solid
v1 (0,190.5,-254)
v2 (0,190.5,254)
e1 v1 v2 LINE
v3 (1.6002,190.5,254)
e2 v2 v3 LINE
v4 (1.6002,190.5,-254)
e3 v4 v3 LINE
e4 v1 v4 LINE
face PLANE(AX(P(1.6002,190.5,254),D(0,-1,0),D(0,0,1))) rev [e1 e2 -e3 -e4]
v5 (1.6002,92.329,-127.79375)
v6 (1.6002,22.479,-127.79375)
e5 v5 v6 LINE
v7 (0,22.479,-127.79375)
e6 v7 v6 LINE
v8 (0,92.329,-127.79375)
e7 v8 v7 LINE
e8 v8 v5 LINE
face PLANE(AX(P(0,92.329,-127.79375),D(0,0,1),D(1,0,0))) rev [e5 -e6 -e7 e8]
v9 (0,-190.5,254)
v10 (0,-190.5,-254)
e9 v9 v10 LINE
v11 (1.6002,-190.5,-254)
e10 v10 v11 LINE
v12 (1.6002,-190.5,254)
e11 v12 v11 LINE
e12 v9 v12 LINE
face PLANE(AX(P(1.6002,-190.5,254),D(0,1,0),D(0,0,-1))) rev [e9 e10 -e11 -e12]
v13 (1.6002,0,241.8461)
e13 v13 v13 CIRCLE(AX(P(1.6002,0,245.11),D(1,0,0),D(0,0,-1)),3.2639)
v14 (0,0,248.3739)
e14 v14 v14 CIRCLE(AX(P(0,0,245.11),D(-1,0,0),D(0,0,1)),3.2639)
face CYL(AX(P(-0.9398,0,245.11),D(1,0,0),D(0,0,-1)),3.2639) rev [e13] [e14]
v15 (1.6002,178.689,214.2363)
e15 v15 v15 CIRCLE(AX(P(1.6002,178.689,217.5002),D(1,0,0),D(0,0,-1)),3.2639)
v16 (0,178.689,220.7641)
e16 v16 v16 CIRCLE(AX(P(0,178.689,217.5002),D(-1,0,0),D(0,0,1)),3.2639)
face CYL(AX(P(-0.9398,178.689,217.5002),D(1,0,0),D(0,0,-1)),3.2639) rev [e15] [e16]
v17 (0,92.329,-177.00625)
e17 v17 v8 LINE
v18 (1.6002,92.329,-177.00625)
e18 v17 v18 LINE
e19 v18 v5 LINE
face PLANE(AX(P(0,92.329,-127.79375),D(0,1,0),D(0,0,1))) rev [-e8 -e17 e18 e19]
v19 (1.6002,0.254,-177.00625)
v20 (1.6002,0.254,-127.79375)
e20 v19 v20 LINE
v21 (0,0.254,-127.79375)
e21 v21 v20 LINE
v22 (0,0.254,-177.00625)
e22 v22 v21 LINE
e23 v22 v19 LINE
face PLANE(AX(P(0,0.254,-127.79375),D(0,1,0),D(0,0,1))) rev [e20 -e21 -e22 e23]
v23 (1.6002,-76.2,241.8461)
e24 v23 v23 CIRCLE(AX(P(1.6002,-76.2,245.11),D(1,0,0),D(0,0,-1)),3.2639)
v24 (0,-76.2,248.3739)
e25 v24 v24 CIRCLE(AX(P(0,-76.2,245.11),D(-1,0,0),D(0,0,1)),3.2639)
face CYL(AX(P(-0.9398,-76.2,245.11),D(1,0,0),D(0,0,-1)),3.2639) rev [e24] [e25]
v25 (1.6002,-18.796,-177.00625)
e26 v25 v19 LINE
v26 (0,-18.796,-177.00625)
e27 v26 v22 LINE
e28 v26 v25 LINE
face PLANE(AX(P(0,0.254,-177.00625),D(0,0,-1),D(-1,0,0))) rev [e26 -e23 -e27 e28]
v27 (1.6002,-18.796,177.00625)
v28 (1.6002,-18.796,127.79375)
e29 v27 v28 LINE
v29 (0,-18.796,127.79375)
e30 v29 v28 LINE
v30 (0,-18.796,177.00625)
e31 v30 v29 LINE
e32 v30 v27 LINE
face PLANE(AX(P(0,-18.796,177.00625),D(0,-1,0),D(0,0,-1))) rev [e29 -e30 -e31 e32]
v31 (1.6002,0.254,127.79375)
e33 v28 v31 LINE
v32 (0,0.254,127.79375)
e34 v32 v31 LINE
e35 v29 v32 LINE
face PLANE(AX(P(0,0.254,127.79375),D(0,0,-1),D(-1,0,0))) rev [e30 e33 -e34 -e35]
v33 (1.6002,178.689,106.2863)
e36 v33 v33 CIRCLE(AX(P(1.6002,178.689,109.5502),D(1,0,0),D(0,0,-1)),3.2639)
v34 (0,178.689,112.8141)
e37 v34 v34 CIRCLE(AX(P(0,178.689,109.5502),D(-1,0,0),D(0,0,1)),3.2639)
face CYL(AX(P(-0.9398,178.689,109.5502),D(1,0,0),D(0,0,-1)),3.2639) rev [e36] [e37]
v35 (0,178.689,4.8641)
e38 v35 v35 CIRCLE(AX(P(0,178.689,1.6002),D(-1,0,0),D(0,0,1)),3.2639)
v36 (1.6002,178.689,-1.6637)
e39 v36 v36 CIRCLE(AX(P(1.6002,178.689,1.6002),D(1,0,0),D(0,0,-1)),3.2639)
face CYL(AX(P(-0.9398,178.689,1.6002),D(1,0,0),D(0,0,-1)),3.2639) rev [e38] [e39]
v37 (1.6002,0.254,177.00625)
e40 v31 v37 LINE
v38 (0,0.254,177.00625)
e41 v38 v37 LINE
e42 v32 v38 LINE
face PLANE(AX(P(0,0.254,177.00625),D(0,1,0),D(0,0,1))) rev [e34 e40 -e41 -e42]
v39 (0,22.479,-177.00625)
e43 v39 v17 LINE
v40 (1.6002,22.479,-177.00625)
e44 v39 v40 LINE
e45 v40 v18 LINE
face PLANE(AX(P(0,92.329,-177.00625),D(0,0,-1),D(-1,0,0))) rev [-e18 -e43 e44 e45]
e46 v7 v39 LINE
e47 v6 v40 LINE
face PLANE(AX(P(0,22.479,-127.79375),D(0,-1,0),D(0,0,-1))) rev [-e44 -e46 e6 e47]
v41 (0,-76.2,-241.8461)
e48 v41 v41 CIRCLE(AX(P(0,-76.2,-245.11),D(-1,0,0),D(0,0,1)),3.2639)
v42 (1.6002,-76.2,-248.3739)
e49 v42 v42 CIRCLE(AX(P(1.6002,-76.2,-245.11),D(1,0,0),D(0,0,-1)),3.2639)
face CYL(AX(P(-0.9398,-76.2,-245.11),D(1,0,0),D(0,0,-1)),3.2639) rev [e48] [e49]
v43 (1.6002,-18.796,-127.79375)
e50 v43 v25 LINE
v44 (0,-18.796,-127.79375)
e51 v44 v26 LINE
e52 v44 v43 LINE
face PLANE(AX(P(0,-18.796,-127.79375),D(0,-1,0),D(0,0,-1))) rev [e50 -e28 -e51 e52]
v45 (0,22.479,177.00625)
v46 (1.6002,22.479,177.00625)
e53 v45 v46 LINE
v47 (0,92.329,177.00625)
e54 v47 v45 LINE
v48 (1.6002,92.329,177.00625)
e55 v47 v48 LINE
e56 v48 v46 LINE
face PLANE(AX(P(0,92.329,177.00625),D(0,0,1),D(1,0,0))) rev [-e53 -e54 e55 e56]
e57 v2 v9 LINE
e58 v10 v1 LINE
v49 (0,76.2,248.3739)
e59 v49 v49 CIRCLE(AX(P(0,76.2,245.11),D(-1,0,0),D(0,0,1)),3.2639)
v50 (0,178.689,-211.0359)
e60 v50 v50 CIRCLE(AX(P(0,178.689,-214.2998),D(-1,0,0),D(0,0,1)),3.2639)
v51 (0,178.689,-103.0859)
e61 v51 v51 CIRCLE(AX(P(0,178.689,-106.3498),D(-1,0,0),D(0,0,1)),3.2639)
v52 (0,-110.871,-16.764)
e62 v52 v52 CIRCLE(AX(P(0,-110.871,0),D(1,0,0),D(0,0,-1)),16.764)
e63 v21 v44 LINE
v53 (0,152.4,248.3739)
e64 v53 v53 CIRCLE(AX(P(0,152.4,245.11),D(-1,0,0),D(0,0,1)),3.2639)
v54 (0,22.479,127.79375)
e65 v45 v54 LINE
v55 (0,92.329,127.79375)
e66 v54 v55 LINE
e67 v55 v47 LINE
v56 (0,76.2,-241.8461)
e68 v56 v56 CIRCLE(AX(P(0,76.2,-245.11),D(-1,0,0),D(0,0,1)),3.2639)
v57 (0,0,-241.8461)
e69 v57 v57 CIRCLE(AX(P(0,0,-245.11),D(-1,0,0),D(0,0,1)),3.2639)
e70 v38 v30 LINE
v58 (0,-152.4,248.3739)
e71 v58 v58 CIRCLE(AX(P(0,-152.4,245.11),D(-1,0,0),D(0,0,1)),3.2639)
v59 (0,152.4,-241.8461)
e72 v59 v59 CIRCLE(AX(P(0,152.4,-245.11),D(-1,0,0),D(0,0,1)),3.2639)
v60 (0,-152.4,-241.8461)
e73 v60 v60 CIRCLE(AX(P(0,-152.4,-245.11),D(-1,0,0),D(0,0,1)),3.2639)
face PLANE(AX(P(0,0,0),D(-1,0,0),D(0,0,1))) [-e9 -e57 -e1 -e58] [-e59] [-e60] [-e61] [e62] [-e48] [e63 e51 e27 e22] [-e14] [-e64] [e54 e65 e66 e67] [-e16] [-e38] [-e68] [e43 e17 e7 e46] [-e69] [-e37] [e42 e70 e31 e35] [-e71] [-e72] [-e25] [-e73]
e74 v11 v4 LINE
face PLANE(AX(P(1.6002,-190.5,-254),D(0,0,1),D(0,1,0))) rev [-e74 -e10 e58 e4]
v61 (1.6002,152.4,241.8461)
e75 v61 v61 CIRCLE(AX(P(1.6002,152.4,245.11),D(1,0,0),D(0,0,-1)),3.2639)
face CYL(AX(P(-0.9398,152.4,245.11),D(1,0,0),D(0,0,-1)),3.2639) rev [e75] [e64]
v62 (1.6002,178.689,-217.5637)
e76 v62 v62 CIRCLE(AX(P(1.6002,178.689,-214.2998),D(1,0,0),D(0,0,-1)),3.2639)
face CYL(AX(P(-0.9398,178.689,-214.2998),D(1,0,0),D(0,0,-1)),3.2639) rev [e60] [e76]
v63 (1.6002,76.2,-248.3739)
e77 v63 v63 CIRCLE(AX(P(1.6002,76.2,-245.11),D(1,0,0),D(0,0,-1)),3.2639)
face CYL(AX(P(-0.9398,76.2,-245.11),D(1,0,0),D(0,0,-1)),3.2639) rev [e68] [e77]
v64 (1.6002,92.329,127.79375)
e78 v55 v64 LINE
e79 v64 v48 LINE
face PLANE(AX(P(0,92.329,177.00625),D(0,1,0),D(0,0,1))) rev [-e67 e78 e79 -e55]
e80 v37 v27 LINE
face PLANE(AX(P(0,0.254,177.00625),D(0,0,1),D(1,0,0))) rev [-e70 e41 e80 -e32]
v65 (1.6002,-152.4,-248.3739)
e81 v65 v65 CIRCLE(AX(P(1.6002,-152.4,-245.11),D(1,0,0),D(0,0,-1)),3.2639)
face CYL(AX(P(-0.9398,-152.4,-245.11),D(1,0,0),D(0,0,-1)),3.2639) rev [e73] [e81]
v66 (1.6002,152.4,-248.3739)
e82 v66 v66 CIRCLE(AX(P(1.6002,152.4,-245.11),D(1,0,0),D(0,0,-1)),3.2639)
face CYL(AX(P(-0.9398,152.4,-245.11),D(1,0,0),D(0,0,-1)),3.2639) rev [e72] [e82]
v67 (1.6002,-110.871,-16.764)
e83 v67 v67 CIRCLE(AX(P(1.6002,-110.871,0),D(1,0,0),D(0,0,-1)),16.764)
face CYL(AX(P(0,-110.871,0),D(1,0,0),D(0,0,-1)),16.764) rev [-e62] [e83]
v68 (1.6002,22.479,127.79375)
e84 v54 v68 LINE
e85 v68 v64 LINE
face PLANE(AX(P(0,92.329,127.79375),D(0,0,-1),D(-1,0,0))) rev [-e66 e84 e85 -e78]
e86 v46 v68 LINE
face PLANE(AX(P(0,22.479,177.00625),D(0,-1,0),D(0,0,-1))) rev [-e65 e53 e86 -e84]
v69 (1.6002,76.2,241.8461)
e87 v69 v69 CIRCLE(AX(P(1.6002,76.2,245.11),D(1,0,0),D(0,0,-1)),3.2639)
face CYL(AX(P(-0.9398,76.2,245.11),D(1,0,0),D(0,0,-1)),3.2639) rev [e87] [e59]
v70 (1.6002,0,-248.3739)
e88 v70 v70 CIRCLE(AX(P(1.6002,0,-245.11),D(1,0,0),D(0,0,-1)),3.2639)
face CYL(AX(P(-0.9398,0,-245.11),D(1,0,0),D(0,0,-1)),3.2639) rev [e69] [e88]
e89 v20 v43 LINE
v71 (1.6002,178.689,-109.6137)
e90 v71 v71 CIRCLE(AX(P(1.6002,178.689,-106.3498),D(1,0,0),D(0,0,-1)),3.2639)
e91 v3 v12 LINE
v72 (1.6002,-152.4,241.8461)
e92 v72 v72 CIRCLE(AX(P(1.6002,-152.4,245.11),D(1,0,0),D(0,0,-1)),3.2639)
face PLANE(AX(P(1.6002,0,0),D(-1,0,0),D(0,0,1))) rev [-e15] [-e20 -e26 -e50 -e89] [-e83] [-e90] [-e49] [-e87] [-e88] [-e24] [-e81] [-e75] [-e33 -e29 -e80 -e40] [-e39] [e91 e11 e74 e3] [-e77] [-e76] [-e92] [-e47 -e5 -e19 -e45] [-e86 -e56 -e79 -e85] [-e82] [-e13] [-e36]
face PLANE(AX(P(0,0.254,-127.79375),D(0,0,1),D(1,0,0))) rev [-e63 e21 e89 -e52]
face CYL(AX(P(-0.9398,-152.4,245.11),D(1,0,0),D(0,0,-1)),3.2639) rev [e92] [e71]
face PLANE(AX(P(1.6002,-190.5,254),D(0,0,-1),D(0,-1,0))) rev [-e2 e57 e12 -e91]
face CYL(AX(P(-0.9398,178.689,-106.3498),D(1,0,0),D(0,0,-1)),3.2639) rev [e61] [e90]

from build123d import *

# Parameters (mm, degrees)
SKETCH1_W           = 508
SKETCH1_H           = 381
BOSS_EXTRUDE1_DEPTH = 1.6002
SKETCH5_R           = 3.2639
CUT_EXTRUDE1_DEPTH  = 2.54
SKETCH7_R           = 3.2639
CUT_EXTRUDE3_DEPTH  = 2.54
SKETCH8_W           = 49.2125
SKETCH8_H           = 69.85
SKETCH8_H_2         = 19.05
CUT_EXTRUDE4_DEPTH  = 318.504032478
SKETCH9_R           = 16.764
CUT_EXTRUDE5_DEPTH  = 318.504032478


with BuildPart() as part:
    # Sketch1 → Boss-Extrude1 (new body)
    with BuildSketch(Plane(origin=(0, 0, 0), x_dir=(0, 0, -1), z_dir=(1, 0, 0))):
        Rectangle(SKETCH1_W, SKETCH1_H)
    extrude(amount=BOSS_EXTRUDE1_DEPTH)

    # Sketch5 → Cut-Extrude1 (cut)
    with BuildSketch(Plane(origin=(1.6002, 0, 0), x_dir=(0, 0, -1), z_dir=(1, 0, 0))):
        with Locations((-245.11, 152.4)):
            Circle(SKETCH5_R)
        with Locations((-245.11, 76.2)):
            Circle(SKETCH5_R)
        with Locations((-245.11, 0)):
            Circle(SKETCH5_R)
        with Locations((-245.11, -76.2)):
            Circle(SKETCH5_R)
        with Locations((-245.11, -152.4)):
            Circle(SKETCH5_R)
        with Locations((245.11, 152.4)):
            Circle(SKETCH5_R)
        with Locations((245.11, 76.2)):
            Circle(SKETCH5_R)
        with Locations((245.11, 0)):
            Circle(SKETCH5_R)
        with Locations((245.11, -76.2)):
            Circle(SKETCH5_R)
        with Locations((245.11, -152.4)):
            Circle(SKETCH5_R)
    extrude(amount=-CUT_EXTRUDE1_DEPTH, mode=Mode.SUBTRACT)

    # Sketch7 → Cut-Extrude3 (cut)
    with BuildSketch(Plane(origin=(1.6002, 0, 0), x_dir=(0, 0, -1), z_dir=(1, 0, 0))):
        with Locations((-217.5002, 178.689)):
            Circle(SKETCH7_R)
        with Locations((-109.5502, 178.689)):
            Circle(SKETCH7_R)
        with Locations((-1.6002, 178.689)):
            Circle(SKETCH7_R)
        with Locations((106.3498, 178.689)):
            Circle(SKETCH7_R)
        with Locations((214.2998, 178.689)):
            Circle(SKETCH7_R)
    extrude(amount=-CUT_EXTRUDE3_DEPTH, mode=Mode.SUBTRACT)

    # Sketch8 → Cut-Extrude4 (cut, through all)
    with BuildSketch(Plane(origin=(1.6002, 0, 0), x_dir=(0, 0, -1), z_dir=(1, 0, 0))):
        with Locations((-152.4, 57.404)):
            Rectangle(SKETCH8_W, SKETCH8_H)
        with Locations((152.4, 57.404)):
            Rectangle(SKETCH8_W, SKETCH8_H)
        with Locations((152.4, -9.271)):
            Rectangle(SKETCH8_W, SKETCH8_H_2)
        with Locations((-152.4, -9.271)):
            Rectangle(SKETCH8_W, SKETCH8_H_2)
    extrude(amount=-CUT_EXTRUDE4_DEPTH, mode=Mode.SUBTRACT)

    # Sketch9 → Cut-Extrude5 (cut, through all)
    with BuildSketch(Plane(origin=(1.6002, 0, 0), x_dir=(0, 0, -1), z_dir=(1, 0, 0))):
        with Locations((0, -110.871)):
            Circle(SKETCH9_R)
    extrude(amount=-CUT_EXTRUDE5_DEPTH, mode=Mode.SUBTRACT)


solid = part.part
